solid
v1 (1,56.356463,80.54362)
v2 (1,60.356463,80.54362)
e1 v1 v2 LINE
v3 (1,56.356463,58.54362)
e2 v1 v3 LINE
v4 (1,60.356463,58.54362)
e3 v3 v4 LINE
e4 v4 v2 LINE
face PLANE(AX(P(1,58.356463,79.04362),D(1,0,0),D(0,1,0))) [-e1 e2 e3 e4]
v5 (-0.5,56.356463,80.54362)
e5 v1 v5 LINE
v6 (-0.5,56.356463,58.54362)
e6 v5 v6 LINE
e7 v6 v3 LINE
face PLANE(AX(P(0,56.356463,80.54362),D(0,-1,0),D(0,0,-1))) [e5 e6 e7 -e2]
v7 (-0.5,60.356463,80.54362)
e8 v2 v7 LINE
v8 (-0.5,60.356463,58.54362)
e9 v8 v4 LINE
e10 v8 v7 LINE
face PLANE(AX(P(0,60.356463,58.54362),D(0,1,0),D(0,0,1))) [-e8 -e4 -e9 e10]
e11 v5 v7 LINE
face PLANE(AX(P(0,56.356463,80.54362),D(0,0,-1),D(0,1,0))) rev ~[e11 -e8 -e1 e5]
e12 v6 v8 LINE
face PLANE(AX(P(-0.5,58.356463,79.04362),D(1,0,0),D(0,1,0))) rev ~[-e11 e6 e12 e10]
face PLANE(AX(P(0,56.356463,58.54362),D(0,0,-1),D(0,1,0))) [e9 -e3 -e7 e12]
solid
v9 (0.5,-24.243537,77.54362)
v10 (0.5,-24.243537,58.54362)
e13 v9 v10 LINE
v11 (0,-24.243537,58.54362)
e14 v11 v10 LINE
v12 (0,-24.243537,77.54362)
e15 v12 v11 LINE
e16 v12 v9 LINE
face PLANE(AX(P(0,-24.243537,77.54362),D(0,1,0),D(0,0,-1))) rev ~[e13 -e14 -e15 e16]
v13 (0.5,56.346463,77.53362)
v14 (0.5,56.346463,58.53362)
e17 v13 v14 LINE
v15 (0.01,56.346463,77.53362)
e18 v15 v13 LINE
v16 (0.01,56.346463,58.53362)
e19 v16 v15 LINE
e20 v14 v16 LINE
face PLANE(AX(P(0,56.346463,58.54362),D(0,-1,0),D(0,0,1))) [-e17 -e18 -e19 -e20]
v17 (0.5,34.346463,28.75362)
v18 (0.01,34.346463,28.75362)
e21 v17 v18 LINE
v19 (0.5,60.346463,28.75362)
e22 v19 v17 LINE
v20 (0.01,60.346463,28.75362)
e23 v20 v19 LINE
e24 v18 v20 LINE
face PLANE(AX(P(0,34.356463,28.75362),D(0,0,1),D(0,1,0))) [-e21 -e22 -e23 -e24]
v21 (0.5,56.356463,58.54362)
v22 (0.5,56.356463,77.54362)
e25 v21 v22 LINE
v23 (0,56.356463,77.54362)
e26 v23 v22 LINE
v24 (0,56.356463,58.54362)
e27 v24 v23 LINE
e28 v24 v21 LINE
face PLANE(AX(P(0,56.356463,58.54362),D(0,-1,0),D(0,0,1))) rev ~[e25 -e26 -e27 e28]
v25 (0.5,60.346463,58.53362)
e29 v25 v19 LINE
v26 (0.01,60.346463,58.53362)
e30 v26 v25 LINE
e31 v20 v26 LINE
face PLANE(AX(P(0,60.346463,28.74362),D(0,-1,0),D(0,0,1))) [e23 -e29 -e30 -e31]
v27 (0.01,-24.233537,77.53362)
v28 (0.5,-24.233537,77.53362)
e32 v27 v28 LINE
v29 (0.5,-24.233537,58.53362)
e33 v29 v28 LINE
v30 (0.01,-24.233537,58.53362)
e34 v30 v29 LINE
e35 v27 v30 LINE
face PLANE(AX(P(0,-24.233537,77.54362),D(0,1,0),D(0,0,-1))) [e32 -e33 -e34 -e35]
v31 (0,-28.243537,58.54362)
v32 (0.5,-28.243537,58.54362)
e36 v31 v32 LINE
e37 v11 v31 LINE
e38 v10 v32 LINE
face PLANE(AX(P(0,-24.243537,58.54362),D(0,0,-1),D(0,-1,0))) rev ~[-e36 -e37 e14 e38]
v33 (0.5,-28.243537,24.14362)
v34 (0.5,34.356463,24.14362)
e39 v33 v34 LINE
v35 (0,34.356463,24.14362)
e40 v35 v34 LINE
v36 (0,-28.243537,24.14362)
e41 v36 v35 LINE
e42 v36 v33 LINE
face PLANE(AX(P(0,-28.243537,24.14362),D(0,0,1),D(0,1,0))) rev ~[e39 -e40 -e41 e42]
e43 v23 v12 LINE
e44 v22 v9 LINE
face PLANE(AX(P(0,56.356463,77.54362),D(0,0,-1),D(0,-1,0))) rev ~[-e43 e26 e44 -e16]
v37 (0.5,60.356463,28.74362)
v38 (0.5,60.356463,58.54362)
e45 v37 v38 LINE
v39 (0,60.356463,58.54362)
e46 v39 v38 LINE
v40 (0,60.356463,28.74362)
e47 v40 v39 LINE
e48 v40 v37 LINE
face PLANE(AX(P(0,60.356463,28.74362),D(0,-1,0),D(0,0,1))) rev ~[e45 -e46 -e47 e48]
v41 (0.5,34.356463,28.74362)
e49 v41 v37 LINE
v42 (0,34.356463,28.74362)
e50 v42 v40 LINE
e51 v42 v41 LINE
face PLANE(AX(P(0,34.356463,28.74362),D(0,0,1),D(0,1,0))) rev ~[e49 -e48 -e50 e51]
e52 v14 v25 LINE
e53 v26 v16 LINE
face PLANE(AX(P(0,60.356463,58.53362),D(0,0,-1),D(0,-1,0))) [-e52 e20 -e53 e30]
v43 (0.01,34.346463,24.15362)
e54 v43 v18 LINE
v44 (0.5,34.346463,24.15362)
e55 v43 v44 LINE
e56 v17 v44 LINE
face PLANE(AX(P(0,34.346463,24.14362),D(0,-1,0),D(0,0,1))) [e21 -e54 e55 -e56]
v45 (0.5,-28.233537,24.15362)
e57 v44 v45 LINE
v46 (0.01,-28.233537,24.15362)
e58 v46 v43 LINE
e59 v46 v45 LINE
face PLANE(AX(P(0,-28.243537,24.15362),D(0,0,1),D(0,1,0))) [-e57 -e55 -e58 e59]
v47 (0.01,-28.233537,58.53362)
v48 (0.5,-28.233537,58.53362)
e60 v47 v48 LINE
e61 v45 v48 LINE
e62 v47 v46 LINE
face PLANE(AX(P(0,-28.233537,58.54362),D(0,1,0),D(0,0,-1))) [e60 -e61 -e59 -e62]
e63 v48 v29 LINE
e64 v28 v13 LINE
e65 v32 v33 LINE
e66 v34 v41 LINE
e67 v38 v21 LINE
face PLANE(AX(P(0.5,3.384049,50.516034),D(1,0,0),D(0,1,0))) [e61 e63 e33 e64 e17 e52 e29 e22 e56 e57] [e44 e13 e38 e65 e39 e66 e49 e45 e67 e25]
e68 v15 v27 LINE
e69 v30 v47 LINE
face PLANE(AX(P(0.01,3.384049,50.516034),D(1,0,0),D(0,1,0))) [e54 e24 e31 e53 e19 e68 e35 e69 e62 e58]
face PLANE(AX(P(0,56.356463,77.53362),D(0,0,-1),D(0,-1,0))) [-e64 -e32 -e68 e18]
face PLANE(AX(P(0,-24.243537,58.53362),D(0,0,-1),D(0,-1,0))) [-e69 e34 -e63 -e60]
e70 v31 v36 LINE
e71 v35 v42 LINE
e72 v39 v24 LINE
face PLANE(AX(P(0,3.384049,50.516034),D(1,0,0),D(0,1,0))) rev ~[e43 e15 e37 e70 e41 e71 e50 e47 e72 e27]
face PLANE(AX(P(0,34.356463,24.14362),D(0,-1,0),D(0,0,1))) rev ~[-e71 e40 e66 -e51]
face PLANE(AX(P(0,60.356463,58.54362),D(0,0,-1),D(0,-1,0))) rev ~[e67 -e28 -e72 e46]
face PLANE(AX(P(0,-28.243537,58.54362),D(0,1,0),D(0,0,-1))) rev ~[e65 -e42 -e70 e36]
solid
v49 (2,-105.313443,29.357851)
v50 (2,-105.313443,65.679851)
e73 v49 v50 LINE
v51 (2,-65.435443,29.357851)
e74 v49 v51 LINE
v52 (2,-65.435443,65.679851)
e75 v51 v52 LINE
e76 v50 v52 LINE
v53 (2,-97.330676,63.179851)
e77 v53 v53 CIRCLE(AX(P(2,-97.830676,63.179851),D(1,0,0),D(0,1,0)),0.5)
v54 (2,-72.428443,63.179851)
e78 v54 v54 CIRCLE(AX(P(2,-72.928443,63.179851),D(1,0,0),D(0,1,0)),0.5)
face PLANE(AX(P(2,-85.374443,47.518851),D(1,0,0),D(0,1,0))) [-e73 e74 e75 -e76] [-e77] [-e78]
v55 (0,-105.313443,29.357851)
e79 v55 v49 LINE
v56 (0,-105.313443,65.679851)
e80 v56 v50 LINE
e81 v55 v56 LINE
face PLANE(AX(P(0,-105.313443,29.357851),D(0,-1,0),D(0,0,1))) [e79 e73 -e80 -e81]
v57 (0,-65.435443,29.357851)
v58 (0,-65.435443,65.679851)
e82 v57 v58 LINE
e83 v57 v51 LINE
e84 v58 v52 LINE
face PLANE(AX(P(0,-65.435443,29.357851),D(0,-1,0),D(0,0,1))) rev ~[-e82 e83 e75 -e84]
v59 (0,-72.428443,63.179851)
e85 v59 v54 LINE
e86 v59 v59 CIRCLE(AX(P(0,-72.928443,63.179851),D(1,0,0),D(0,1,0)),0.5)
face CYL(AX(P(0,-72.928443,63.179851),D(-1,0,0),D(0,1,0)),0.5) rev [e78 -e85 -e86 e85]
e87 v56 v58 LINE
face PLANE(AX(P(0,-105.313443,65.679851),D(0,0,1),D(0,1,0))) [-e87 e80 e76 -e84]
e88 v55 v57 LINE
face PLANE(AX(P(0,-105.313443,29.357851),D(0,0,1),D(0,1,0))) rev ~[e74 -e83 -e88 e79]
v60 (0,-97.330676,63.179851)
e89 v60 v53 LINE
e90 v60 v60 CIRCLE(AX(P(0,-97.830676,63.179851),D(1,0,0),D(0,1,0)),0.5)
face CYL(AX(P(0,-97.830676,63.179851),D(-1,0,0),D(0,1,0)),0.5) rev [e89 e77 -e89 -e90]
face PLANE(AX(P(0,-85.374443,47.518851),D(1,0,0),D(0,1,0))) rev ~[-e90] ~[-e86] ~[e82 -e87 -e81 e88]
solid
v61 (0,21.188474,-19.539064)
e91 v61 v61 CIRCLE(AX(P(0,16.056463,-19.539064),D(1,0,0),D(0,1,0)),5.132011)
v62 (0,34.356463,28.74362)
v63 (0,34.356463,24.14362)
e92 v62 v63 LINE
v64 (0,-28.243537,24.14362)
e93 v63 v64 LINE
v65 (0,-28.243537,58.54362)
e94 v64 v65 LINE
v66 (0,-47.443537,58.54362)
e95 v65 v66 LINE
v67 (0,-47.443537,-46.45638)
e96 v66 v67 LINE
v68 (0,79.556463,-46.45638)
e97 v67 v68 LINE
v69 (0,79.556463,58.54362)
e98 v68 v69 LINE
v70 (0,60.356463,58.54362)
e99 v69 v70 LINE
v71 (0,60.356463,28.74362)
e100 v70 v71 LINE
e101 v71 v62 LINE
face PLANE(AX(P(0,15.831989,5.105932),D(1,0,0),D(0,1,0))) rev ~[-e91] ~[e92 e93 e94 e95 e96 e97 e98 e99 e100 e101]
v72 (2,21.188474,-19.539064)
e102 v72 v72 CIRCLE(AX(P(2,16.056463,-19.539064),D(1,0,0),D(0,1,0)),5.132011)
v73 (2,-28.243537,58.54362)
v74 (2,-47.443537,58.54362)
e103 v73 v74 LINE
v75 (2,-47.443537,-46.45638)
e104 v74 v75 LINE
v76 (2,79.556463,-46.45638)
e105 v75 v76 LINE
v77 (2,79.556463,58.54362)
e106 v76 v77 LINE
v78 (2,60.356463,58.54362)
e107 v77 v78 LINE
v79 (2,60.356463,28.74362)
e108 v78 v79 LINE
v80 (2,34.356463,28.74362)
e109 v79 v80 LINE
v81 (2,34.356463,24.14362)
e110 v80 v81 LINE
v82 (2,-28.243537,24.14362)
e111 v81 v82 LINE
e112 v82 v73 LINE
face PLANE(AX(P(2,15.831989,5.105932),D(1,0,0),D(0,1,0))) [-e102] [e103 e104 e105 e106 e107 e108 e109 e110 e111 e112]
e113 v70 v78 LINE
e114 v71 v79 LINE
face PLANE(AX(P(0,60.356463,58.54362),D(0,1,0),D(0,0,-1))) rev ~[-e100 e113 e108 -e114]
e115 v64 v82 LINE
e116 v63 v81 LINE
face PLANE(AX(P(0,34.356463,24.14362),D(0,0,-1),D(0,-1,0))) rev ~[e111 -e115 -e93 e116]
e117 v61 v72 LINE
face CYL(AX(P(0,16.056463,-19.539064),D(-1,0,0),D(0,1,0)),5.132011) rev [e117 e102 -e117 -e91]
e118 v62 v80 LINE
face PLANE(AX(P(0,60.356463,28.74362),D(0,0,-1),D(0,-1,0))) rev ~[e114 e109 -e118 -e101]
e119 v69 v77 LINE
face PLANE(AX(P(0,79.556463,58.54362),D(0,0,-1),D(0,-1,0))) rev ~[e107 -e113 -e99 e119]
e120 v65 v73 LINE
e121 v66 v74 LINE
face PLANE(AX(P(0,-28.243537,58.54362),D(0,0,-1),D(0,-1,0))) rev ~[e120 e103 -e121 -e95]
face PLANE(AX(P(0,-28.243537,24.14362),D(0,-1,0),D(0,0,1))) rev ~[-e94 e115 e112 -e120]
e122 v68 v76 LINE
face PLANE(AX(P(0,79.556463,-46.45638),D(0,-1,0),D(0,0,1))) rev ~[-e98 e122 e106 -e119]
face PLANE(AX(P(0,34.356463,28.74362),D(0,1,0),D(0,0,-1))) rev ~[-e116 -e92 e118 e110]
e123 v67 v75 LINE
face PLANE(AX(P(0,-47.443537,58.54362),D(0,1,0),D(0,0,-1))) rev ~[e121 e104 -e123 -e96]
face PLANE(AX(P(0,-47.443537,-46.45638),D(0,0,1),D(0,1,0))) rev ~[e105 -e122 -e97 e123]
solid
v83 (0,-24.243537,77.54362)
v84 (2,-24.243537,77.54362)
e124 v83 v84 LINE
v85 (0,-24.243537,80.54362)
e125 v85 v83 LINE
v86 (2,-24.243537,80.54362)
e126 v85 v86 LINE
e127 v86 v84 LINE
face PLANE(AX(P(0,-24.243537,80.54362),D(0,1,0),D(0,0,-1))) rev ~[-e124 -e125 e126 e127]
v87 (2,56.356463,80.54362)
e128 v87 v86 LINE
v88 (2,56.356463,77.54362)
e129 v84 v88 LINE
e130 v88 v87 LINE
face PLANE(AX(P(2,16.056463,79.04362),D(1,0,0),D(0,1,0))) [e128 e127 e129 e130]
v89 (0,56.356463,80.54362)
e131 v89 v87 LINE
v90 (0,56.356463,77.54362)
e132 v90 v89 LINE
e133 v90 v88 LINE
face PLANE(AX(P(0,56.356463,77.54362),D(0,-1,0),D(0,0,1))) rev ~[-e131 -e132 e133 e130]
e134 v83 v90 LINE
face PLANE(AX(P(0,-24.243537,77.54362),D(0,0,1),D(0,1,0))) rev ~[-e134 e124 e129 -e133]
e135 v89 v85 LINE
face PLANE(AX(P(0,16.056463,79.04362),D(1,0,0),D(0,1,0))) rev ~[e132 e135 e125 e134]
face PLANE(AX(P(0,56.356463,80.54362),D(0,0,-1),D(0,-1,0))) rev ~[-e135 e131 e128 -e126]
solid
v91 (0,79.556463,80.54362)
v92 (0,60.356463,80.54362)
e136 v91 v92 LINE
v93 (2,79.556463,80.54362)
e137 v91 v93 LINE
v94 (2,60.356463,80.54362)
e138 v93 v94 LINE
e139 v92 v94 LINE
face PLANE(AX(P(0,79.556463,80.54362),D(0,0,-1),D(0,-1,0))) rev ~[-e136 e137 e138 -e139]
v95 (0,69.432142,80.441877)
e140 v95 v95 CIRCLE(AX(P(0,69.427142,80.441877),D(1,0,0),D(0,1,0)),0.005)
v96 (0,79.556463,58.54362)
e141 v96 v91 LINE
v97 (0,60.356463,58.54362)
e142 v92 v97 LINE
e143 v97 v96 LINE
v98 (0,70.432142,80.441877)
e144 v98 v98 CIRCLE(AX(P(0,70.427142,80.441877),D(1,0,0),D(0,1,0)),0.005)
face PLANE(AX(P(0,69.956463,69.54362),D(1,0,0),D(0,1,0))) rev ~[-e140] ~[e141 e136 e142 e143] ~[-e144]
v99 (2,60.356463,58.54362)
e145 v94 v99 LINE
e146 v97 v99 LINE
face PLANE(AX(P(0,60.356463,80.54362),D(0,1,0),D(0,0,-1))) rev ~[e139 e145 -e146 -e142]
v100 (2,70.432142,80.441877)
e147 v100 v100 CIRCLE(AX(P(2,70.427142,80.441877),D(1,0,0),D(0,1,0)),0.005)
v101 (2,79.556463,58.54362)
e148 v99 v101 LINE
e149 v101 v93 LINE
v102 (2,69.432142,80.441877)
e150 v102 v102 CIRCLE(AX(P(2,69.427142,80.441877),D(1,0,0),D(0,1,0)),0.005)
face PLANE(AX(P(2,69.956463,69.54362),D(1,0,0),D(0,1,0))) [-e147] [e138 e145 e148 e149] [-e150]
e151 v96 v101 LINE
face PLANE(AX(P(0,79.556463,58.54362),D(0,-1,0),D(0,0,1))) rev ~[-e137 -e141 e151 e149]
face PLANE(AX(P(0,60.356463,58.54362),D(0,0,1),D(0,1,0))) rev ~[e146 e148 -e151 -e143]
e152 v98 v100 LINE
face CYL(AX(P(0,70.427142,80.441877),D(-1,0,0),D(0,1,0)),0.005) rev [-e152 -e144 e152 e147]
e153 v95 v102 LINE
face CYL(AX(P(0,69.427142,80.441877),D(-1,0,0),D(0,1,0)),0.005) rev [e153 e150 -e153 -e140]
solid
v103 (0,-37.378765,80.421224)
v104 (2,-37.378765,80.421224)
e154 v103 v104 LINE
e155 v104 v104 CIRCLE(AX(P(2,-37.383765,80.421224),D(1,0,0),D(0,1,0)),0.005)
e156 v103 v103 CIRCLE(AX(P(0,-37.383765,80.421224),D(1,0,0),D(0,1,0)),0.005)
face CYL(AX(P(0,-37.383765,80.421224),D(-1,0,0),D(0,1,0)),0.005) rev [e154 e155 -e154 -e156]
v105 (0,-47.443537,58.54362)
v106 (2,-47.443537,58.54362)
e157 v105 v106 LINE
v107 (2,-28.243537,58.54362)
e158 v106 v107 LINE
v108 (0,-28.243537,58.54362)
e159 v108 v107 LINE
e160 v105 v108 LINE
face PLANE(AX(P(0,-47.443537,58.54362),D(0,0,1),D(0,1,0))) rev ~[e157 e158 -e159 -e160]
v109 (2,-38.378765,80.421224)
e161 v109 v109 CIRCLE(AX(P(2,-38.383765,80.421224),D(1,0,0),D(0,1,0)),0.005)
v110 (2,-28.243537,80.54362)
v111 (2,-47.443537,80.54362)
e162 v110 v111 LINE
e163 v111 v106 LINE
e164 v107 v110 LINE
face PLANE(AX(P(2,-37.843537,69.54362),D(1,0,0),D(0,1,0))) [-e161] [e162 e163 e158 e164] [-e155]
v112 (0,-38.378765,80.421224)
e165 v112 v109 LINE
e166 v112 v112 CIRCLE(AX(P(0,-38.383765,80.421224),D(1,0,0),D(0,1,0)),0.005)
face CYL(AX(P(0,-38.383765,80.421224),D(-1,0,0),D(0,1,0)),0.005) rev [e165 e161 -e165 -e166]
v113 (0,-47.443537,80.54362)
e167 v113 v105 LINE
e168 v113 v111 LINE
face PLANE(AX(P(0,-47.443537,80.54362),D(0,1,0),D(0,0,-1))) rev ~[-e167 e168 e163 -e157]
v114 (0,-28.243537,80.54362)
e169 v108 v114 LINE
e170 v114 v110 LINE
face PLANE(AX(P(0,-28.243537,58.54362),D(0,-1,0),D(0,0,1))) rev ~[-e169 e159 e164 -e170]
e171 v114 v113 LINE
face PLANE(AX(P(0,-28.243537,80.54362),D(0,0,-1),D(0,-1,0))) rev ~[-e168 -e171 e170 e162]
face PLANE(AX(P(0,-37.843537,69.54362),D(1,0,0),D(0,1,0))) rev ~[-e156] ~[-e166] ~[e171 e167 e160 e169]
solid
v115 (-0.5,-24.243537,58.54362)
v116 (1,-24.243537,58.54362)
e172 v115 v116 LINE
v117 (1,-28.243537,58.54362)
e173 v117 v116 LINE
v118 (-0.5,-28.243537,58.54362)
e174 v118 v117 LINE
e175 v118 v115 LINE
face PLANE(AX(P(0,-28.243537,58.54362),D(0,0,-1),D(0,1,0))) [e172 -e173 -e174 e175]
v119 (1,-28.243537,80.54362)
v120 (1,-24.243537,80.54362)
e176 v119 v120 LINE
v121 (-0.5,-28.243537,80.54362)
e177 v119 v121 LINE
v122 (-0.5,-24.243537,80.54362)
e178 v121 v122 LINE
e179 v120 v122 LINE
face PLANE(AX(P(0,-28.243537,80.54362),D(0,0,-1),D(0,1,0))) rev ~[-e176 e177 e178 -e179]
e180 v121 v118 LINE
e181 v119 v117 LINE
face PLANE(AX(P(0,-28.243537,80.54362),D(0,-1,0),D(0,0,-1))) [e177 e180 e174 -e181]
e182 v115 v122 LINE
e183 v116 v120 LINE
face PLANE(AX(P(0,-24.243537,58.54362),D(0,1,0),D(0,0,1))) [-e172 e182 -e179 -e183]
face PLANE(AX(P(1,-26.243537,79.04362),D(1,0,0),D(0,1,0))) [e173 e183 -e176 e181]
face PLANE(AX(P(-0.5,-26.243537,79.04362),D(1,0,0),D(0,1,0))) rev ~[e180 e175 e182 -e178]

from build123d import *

# Parameters (mm, degrees)
F1_W          = 39.878
F1_H          = 36.322
F1_R          = 0.5
F2_DEPTH      = 2
F4_DEPTH      = 0.5
F5_T          = -0.01
F0_R          = 5.1320105677
F6_DEPTH      = 2
F0_R_2        = 0.005
F7_DEPTH      = 2
F0_W          = 4
F0_H          = 3
F0_H_2        = 19
F8_DEPTH      = 1
F8_DEPTH_BACK = 0.5


# Not quite as in the source:
# - the program builds the solid bodies; features that only make, move or delete a surface that nothing else refers to are left out


with BuildPart() as f2:
    # F1 (on Right) → F2 (new body)
    with BuildSketch(Plane.YZ):
        with Locations((-85.3744426475, 47.5188505783)):
            Rectangle(F1_W, F1_H)
        with Locations((-97.8306755424, 63.1798505783)):
            Circle(F1_R, mode=Mode.SUBTRACT)
        with Locations((-72.9284426475, 63.1798505783)):
            Circle(F1_R, mode=Mode.SUBTRACT)
    extrude(amount=F2_DEPTH)


with BuildPart() as f4:
    # F0 (on Right) → F4 (new body)
    with BuildSketch(Plane.YZ):
        Polygon((-24.2435368776, 58.5436199023), (-28.2435368776, 58.5436199023), (-28.2435368776, 24.1436199023), (34.3564631224, 24.1436199023), (34.3564631224, 28.7436199023), (34.3564631224, 77.5436199023), (-24.2435368776, 77.5436199023), align=None)
        Polygon((56.3564631224, 58.5436199023), (56.3564631224, 77.5436199023), (34.3564631224, 77.5436199023), (34.3564631224, 28.7436199023), (60.3564631224, 28.7436199023), (60.3564631224, 58.5436199023), align=None)
    extrude(amount=F4_DEPTH)

    # F5
    f5_openings = [f4.faces().sort_by_distance(p)[0] for p in [
        (0.5, 15.21705, 50.911751),
    ]]
    offset(amount=F5_T, openings=f5_openings, kind=Kind.INTERSECTION)


with BuildPart() as f6:
    # F0 (on Right) → F6 (new body)
    with BuildSketch(Plane.YZ):
        Polygon((-28.2435368776, 58.5436199023), (-47.4435368776, 58.5436199023), (-47.4435368776, -46.4563800977), (79.5564631224, -46.4563800977), (79.5564631224, 58.5436199023), (60.3564631224, 58.5436199023), (60.3564631224, 28.7436199023), (34.3564631224, 28.7436199023), (34.3564631224, 24.1436199023), (-28.2435368776, 24.1436199023), align=None)
        with Locations((16.0564631224, -19.5390637964)):
            Circle(F0_R, mode=Mode.SUBTRACT)
    extrude(amount=F6_DEPTH)


with BuildPart() as f7:
    # F0 (on Right) → F7 (new body)
    with BuildSketch(Plane.YZ):
        Polygon((-28.2435368776, 80.5436199023), (-47.4435368776, 80.5436199023), (-47.4435368776, 58.5436199023), (-28.2435368776, 58.5436199023), (-28.2435368776, 77.5436199023), align=None)
        with Locations((-38.3837649822, 80.4212242365)):
            Circle(F0_R_2, mode=Mode.SUBTRACT)
        with Locations((-37.3837649822, 80.4212242365)):
            Circle(F0_R_2, mode=Mode.SUBTRACT)
    extrude(amount=F7_DEPTH)


with BuildPart() as f7b:
    # F0 (on Right) → F7, piece 2 (new body)
    with BuildSketch(Plane.YZ):
        Polygon((79.5564631224, 80.5436199023), (60.3564631224, 80.5436199023), (60.3564631224, 77.5436199023), (60.3564631224, 58.5436199023), (79.5564631224, 58.5436199023), align=None)
        with Locations((69.4271420836, 80.4418772459)):
            Circle(F0_R_2, mode=Mode.SUBTRACT)
        with Locations((70.4271420836, 80.4418772459)):
            Circle(F0_R_2, mode=Mode.SUBTRACT)
    extrude(amount=F7_DEPTH)


with BuildPart() as f7c:
    # F0 (on Right) → F7, piece 3 (new body)
    with BuildSketch(Plane.YZ):
        Polygon((56.3564631224, 80.5436199023), (-24.2435368776, 80.5436199023), (-24.2435368776, 77.5436199023), (34.3564631224, 77.5436199023), (56.3564631224, 77.5436199023), align=None)
    extrude(amount=F7_DEPTH)


with BuildPart() as f8:
    # F0 (on Right) → F8 (new body, two sides)
    with BuildSketch(Plane.YZ) as f8_sk:
        with Locations((-26.2435368776, 79.0436199023)):
            Rectangle(F0_W, F0_H)
        with Locations((-26.2435368776, 68.0436199023)):
            Rectangle(F0_W, F0_H_2)
    extrude(amount=F8_DEPTH)
    extrude(f8_sk.sketch, amount=-F8_DEPTH_BACK)


with BuildPart() as f8b:
    # F0 (on Right) → F8, piece 2 (new body, two sides)
    with BuildSketch(Plane.YZ) as f8_2_sk:
        with Locations((58.3564631224, 79.0436199023)):
            Rectangle(F0_W, F0_H)
        with Locations((58.3564631224, 68.0436199023)):
            Rectangle(F0_W, F0_H_2)
    extrude(amount=F8_DEPTH)
    extrude(f8_2_sk.sketch, amount=-F8_DEPTH_BACK)


solid = Compound([f2.part, f4.part, f6.part, f7.part, f7b.part, f7c.part, f8.part, f8b.part])
